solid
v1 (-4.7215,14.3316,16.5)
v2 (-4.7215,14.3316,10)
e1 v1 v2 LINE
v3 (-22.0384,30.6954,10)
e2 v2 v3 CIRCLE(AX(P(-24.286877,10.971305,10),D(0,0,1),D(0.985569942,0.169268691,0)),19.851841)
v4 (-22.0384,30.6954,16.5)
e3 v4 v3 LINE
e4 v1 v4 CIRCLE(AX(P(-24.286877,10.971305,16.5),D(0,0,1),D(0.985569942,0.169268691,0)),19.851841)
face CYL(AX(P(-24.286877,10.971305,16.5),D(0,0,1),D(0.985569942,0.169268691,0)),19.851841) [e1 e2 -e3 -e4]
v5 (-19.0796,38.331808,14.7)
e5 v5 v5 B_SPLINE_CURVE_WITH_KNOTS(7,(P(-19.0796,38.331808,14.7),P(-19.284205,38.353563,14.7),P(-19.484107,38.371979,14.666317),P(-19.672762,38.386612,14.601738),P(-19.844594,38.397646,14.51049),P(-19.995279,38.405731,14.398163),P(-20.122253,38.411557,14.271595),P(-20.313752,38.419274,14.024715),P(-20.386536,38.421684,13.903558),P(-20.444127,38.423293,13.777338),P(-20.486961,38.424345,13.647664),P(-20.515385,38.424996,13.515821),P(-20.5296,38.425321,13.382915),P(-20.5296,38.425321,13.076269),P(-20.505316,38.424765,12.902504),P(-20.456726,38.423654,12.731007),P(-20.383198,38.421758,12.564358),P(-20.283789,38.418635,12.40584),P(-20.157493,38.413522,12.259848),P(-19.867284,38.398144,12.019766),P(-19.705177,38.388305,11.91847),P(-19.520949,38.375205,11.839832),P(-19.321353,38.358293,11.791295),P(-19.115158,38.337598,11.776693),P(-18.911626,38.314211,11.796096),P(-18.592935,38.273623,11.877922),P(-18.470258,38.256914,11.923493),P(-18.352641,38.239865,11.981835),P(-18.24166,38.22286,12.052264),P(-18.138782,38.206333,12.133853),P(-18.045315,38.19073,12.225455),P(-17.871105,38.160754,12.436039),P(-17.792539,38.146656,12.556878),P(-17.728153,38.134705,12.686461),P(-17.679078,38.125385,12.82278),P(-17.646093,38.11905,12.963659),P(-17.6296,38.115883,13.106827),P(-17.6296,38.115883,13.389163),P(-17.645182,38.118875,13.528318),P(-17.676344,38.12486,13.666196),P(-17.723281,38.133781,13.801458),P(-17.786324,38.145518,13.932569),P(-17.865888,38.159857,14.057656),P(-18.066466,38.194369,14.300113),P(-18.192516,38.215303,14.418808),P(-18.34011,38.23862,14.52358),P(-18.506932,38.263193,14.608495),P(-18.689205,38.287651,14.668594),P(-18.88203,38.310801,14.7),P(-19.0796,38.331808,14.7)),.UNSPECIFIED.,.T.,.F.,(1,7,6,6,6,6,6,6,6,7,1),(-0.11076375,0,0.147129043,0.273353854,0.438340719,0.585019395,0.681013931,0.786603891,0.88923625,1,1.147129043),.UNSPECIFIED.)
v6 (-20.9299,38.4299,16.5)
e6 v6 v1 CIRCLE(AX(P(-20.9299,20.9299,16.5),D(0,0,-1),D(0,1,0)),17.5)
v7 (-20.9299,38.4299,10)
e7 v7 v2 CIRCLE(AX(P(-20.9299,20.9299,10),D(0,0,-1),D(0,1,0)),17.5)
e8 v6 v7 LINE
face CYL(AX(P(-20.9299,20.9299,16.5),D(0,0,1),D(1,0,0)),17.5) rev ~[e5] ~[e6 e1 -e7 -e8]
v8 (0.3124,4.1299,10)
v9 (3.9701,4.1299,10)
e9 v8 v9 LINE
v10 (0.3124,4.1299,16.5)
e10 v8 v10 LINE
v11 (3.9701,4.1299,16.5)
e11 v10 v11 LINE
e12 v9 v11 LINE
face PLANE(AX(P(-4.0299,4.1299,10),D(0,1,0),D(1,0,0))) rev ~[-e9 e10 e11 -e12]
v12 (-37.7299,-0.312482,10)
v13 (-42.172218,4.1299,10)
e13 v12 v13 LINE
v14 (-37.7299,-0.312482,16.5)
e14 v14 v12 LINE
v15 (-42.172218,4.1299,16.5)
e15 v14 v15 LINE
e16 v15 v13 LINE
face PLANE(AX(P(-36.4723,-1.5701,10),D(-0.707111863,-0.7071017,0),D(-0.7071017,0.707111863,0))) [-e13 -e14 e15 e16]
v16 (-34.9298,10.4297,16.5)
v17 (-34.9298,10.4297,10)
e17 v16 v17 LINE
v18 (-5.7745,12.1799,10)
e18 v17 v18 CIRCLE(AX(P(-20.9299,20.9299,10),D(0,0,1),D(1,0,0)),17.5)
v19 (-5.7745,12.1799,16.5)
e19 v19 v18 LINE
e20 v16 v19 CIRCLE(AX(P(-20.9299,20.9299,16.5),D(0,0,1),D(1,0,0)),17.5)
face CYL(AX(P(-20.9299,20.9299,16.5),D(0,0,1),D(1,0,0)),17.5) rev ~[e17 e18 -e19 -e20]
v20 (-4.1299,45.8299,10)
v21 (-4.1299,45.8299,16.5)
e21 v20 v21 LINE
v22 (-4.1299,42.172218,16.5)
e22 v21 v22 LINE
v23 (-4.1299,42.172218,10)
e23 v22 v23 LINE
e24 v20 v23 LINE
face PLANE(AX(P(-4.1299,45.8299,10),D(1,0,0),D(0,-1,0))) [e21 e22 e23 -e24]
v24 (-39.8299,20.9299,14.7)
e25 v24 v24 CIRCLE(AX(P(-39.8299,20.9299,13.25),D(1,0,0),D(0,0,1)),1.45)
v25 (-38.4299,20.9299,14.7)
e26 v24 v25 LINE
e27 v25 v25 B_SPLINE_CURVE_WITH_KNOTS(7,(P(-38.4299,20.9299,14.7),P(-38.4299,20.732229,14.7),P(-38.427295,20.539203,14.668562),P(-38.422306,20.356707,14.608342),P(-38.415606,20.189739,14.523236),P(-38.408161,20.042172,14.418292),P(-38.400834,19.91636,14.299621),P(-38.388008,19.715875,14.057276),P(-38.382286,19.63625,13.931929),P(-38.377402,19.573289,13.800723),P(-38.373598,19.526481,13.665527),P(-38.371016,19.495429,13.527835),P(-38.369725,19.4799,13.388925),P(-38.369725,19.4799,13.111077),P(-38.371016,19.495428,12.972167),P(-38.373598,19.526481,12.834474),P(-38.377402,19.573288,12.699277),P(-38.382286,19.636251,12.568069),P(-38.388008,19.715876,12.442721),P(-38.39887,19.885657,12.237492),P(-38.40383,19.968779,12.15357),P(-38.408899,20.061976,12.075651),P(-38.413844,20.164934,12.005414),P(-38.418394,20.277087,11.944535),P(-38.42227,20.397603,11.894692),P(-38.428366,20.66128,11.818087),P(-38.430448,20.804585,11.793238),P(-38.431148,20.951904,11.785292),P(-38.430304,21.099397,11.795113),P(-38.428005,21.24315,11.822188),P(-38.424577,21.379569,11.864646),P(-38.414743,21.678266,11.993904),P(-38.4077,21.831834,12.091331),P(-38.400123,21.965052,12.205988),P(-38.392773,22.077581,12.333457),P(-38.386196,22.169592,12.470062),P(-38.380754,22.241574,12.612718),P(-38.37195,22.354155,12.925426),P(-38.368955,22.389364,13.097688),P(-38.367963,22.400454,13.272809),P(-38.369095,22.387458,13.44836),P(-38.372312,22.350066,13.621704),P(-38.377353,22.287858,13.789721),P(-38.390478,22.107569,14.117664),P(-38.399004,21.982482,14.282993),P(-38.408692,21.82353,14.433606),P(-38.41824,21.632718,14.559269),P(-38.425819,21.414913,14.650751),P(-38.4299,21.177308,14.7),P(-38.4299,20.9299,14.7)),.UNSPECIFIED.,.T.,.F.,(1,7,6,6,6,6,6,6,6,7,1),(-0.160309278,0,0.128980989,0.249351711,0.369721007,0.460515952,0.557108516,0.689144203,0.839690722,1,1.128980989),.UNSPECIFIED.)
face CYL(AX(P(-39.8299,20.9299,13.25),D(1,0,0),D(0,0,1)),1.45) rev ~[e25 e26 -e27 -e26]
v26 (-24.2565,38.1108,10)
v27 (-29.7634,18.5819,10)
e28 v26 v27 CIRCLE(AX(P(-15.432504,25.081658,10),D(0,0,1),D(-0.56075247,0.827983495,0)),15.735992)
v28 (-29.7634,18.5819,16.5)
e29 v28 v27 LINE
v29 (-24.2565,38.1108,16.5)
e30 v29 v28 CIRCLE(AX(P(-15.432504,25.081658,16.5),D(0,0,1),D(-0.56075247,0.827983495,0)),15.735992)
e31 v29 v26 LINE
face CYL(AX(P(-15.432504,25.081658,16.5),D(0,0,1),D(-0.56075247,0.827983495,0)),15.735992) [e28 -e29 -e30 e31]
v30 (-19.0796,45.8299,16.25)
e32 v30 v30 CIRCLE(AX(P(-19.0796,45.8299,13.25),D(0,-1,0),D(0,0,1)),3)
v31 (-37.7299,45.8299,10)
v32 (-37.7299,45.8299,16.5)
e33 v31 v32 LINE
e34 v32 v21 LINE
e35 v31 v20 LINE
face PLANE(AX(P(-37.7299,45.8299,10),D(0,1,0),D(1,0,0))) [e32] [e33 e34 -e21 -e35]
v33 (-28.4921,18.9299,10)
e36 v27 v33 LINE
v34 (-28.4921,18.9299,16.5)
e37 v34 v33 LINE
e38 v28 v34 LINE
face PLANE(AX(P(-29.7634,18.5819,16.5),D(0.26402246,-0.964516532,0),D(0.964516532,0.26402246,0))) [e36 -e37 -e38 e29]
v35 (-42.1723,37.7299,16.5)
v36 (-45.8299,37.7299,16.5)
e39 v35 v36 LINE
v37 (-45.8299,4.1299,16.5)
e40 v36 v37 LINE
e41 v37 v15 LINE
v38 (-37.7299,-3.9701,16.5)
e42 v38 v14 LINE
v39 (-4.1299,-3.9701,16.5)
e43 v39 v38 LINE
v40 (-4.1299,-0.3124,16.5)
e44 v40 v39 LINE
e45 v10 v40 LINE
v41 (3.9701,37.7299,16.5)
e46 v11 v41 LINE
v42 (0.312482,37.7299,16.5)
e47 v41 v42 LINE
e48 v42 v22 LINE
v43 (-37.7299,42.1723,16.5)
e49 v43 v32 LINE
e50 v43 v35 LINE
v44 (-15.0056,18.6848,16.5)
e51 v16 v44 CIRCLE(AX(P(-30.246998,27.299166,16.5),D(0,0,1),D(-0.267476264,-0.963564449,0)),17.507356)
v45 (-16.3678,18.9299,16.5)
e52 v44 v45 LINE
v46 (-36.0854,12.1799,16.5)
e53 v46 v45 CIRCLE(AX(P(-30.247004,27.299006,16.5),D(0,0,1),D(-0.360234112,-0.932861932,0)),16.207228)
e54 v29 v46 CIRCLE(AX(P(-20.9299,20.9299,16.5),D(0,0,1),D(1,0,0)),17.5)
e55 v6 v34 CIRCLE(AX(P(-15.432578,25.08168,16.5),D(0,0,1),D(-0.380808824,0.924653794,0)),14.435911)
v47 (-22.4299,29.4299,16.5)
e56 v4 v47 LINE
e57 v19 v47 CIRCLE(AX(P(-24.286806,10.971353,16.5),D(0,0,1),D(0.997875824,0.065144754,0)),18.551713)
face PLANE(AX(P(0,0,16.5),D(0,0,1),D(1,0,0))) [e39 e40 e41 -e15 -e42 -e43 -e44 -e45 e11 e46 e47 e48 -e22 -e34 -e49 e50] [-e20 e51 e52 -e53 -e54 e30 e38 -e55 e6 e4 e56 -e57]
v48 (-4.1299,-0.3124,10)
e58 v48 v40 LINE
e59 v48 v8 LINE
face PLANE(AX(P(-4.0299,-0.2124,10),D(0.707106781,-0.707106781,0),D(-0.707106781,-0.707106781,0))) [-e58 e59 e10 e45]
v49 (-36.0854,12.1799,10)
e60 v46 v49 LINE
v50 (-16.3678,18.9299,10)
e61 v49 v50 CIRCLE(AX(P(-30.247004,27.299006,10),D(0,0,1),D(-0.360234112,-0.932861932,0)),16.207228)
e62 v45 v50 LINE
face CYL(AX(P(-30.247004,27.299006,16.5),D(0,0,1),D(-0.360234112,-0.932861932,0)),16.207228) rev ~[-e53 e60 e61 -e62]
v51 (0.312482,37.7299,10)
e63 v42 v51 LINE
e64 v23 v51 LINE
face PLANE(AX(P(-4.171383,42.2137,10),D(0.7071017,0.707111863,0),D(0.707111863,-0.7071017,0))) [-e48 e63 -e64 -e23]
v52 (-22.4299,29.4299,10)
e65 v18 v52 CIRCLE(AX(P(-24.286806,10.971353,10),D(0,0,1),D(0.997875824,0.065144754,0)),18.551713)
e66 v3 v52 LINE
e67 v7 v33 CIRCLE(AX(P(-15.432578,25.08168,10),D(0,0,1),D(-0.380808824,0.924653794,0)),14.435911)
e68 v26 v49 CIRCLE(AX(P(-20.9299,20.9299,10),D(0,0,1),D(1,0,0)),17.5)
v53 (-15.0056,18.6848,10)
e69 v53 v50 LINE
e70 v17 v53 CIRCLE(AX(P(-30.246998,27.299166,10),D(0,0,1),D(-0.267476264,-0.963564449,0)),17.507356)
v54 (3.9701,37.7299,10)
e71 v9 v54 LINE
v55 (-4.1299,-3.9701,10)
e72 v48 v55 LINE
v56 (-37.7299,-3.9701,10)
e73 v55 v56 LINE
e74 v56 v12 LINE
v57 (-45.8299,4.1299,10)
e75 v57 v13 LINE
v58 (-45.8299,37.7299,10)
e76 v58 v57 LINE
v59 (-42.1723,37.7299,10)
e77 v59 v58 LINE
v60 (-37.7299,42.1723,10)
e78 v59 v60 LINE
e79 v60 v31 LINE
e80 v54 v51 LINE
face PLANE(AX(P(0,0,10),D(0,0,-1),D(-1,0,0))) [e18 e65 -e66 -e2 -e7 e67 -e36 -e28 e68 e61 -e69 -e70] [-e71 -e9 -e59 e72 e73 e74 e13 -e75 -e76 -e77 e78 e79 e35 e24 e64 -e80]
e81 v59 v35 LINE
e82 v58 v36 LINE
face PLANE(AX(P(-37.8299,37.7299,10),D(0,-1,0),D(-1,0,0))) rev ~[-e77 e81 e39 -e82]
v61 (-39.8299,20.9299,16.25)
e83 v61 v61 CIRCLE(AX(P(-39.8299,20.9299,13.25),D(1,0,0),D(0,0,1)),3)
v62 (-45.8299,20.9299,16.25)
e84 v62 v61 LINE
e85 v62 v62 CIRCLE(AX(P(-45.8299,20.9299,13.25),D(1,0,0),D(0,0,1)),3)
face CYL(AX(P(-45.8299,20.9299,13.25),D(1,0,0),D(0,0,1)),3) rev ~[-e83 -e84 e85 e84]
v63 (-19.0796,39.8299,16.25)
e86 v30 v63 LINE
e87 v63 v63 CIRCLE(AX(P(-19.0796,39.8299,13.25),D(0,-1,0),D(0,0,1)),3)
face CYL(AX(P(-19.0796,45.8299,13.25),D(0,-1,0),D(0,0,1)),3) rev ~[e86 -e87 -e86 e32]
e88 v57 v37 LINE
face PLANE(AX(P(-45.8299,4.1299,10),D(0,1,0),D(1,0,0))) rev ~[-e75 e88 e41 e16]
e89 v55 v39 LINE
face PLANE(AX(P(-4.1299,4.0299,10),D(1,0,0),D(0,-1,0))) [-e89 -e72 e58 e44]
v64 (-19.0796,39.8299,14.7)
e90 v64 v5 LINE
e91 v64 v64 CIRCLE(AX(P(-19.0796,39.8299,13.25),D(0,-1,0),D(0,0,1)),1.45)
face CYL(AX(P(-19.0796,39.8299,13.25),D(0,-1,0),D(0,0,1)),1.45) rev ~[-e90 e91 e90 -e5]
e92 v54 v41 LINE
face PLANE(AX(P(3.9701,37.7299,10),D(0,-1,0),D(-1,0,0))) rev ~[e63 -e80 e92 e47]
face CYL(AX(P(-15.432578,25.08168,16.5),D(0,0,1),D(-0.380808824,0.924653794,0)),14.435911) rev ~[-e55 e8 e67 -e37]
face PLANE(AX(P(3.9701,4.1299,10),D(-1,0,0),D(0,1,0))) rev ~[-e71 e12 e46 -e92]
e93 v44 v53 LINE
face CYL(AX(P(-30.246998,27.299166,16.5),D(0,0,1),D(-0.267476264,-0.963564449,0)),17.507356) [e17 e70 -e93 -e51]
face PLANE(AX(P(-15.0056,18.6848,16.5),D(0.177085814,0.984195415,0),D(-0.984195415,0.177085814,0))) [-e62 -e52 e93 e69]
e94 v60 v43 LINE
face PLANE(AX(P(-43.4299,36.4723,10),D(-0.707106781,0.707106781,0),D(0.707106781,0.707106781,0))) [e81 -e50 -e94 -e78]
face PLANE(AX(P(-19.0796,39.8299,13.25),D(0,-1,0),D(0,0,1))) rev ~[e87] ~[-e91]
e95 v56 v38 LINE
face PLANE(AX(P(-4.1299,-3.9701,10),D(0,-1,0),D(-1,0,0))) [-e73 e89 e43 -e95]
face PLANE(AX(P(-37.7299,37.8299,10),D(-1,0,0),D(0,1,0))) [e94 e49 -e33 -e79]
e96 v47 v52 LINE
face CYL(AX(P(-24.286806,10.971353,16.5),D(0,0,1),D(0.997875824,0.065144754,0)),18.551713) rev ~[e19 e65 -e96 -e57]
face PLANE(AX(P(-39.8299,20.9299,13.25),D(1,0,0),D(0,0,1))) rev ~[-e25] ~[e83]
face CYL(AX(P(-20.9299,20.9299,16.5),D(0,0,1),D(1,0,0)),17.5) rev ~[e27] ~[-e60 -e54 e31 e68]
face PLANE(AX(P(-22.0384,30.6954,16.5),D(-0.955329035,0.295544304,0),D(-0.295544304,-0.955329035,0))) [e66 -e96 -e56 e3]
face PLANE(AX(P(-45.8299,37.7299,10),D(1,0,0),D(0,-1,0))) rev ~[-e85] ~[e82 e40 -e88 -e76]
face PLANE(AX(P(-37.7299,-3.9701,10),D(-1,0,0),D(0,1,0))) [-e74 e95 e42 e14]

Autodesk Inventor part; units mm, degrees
ref_plane "YZ Plane" through (0, 0, 0) normal (1, 0, 0) x (0, 1, 0)
ref_plane "Work Plane1" through (0, 0, 10) normal (0, 0, 1) x (1, 0, 0)
sketch "Sketch1" plane through (0, 0, 10) normal (0, 0, 1) x (1, 0, 0)
  line L0 (-4.0299, -0.3538) -> (-2.2322, 1.4439) construction
  arc A0 (-1.4439, 2.2322) -> (-2.2322, 1.4439) centre (-0.9299, 0.9299) ccw construction
  line L1 (-1.4439, 2.2322) -> (0.3538, 4.0299) construction
  line L2 (-37.8299, 42.2137) -> (-37.8299, 45.8299) construction
  line L3 (-37.8299, 45.8299) -> (-4.0299, 45.8299) construction
  line L4 (-4.0299, 45.8299) -> (-4.0299, 42.2137) construction
  line L5 (-4.0299, 4.0299) -> (0.3538, 4.0299) projected
  line L6 (-20.9299, 58.9723) -> (17.1124, 20.9299) construction
  line L7 (17.1124, 20.9299) -> (-20.9299, -17.1124) construction
  line L8 (-20.9299, -17.1124) -> (-58.9723, 20.9299) construction
  line L9 (-58.9723, 20.9299) -> (-20.9299, 58.9723) construction
  line L10 (-20.9299, 58.9723) -> (-20.9299, -17.1124) construction
  line L11 (17.1124, 20.9299) -> (-58.9723, 20.9299) construction
  line L12 (-20.9299, 58.9723) -> (32.8701, 58.9723) construction
  line L13 (-43.4299, 43.4299) -> (1.5701, 43.4299) construction
  line L14 (1.5701, 43.4299) -> (1.5701, -1.5701) construction
  line L15 (1.5701, -1.5701) -> (-43.4299, -1.5701) construction
  line L16 (-43.4299, -1.5701) -> (-43.4299, 43.4299) construction
  line L17 (-43.4299, 43.4299) -> (1.5701, -1.5701) construction
  line L18 (1.5701, 43.4299) -> (-43.4299, -1.5701) construction
  line L19 (-43.4299, 5.3876) -> (-43.4299, 36.4723)
  line L20 (-43.4299, 36.4723) -> (-36.4723, 43.4299)
  line L21 (-36.4723, 43.4299) -> (-5.3876, 43.4299)
  line L22 (-5.3876, 43.4299) -> (1.5701, 36.4723)
  line L23 (1.5701, 36.4723) -> (1.5701, 5.3876)
  line L24 (1.5701, 5.3876) -> (-5.3876, -1.5701)
  line L25 (-5.3876, -1.5701) -> (-36.4723, -1.5701)
  line L26 (-36.4723, -1.5701) -> (-43.4299, 5.3876)
  line L27 (-4.0299, 42.2137) -> (-37.8299, 42.2137) projected
  line L28 (-4.0299, -0.3538) -> (-4.0299, 4.0299) projected
  circle A1 centre (-20.9299, 20.9299) radius 13.3985
  circle A2 centre (-20.9299, 20.9299) radius 15.4895
  point P0 (-37.8299, 4.0299)
  dimension "d18" = 53.8
  dimension "d19" = 45
  dimension "d20" = 53.8
  dimension "d21" = 45
  dimension "d22" = 45
  dimension "d30" = 26.797
  dimension "d36" = 30.979
extrude "Extrusion1" add sketch "Sketch1" along normal blind 6.5 contours L28 L24 L25 L26 L19 L20 L27 L22 L23 L5 | L5 L24 L28 | L27 L20 L21 L22 | A1 | A2
ref_plane "Work Plane2" through (-40.9959, 0.8639, 22.2359) normal (0, 0, 1) x (1, 0, 0)
sketch "Sketch3" plane through (0, 0, 10) normal (0, 0, -1) x (-1, 0, 0)
  line L0 (37.8299, -0.4701) -> (37.8299, 4.0299) construction
  line L1 (4.0299, 4.0299) -> (4.0299, -0.4701) construction
  line L2 (37.8299, -0.4701) -> (37.8299, 1.1886) construction
  line L3 (4.0299, -3.9701) -> (4.0299, -0.3538) construction
  line L4 (45.8299, 4.0299) -> (42.2137, 4.0299) construction
  line L5 (-0.3538, 4.0299) -> (-3.9701, 4.0299) construction
  line L6 (-3.9701, 37.8299) -> (-0.3538, 37.8299) construction
  line L7 (4.0299, 42.2137) -> (4.0299, 45.8299) construction
  line L8 (37.8299, 45.8299) -> (37.8299, 42.2137) construction
  line L9 (42.2137, 37.8299) -> (45.8299, 37.8299) construction
  line L10 (37.8299, 37.7299) -> (45.8299, 37.7299)
  line L11 (45.8299, 37.7299) -> (45.8299, 4.1299)
  line L12 (45.8299, 4.1299) -> (37.8299, 4.1299)
  line L13 (37.8299, 4.1299) -> (37.8299, 37.7299)
  line L14 (37.7299, 4.0299) -> (4.1299, 4.0299)
  line L15 (4.1299, 4.0299) -> (4.1299, -3.9701)
  line L16 (4.1299, -3.9701) -> (37.7299, -3.9701)
  line L17 (37.7299, -3.9701) -> (37.7299, 4.0299)
  line L18 (4.0299, 4.1299) -> (-3.9701, 4.1299)
  line L19 (-3.9701, 4.1299) -> (-3.9701, 37.7299)
  line L20 (-3.9701, 37.7299) -> (4.0299, 37.7299)
  line L21 (4.0299, 37.7299) -> (4.0299, 4.1299)
  line L22 (4.1299, 37.8299) -> (37.7299, 37.8299)
  line L23 (37.7299, 37.8299) -> (37.7299, 45.8299)
  line L24 (37.7299, 45.8299) -> (4.1299, 45.8299)
  line L25 (4.1299, 45.8299) -> (4.1299, 37.8299)
  point P0 (0, 0)
  dimension "d23" = 0.1
  dimension "d24" = 0.1
  dimension "d25" = 0.1
  dimension "d26" = 0.1
  dimension "d27" = 0.1
extrude "Extrusion3" add sketch "Sketch3" against normal up to surface (6.5 mm away)
sketch "Sketch6" plane through (0, 0, 16.5) normal (0, 0, 1) x (1, 0, 0)
  circle A0 centre (-20.9299, 20.9299) radius 17.5
  circle A1 centre (-20.9299, 20.9299) radius 13.3985
  line L0 (-45.8299, 4.1299) -> (-45.8299, 37.7299) projected
  line L1 (-4.1299, -3.9701) -> (-37.7299, -3.9701) projected
  line L2 (-37.7299, 45.8299) -> (-4.1299, 45.8299) projected
  point P0 (0, 0)
  point P1 (-45.8299, 20.9299)
  point P2 (-20.9299, -3.9701)
  point P3 (-20.9299, 45.8299)
  dimension "d37" = 26.797
  dimension "d38" = 35
extrude "Extrusion5" cut sketch "Sketch6" against normal blind 12 contours A0 | A1
sketch "Sketch7" plane through (0, 0, 16.5) normal (0, 0, 1) x (1, 0, 0)
  circle A0 centre (-20.9299, 20.9299) radius 17.5 construction
  line L0 (3.9701, 4.1299) -> (0.3124, 4.1299) construction
  line L1 (3.9701, 37.7299) -> (3.9701, 4.1299) construction
  line L2 (0.3124, 37.7299) -> (3.9701, 37.7299) construction
  line L3 (0.3124, 37.7299) -> (-4.1299, 42.1723) construction
  line L4 (-4.1299, 45.8299) -> (-4.1299, 42.1723) construction
  line L5 (-37.7299, 45.8299) -> (-4.1299, 45.8299) construction
  line L6 (-37.7299, 42.1723) -> (-37.7299, 45.8299) construction
  line L7 (-37.7299, 42.1723) -> (-42.1723, 37.7299) construction
  line L8 (-45.8299, 37.7299) -> (-42.1723, 37.7299) construction
  line L9 (-45.8299, 4.1299) -> (-45.8299, 37.7299) construction
  line L10 (-42.1723, 4.1299) -> (-45.8299, 4.1299) construction
  line L11 (-42.1723, 4.1299) -> (-37.7299, -0.3124) construction
  line L12 (-37.7299, -3.9701) -> (-37.7299, -0.3124) construction
  line L13 (-4.1299, -3.9701) -> (-37.7299, -3.9701) construction
  line L14 (-4.1299, -0.3124) -> (-4.1299, -3.9701) construction
  line L15 (-4.1299, -0.3124) -> (0.3124, 4.1299) construction
  circle A1 centre (-20.9299, 20.9299) radius 17.5 construction
  line L16 (-5.7745, 12.1799) -> (-36.0854, 12.1799) construction
  line L17 (-36.0854, 12.1799) -> (-20.9299, 38.4299) construction
  line L18 (-20.9299, 38.4299) -> (-5.7745, 12.1799) construction
  circle A2 centre (-22.4299, 22.4299) radius 7 construction
  arc A3 (-20.9299, 38.4299) -> (-24.2565, 38.1108) centre (-20.9299, 20.9299) ccw
  line L19 (-28.4921, 18.9299) -> (-22.4299, 29.4299)
  line L20 (-22.4299, 29.4299) -> (-16.3678, 18.9299)
  line L21 (-16.3678, 18.9299) -> (-28.4921, 18.9299)
  arc A4 (-20.9299, 38.4299) -> (-28.4921, 18.9299) centre (-15.4327, 25.0818) ccw
  arc A5 (-24.2565, 38.1108) -> (-29.7634, 18.5819) centre (-15.4327, 25.0818) ccw
  line L22 (-29.7634, 18.5819) -> (-28.4921, 18.9299)
  arc A6 (-5.7745, 12.1799) -> (-22.4299, 29.4299) centre (-24.2867, 10.9714) ccw
  arc A7 (-5.7745, 12.1799) -> (-4.7215, 14.3316) centre (-20.9299, 20.9299) ccw
  arc A8 (-4.7215, 14.3316) -> (-22.0384, 30.6954) centre (-24.2867, 10.9714) ccw
  line L23 (-22.0384, 30.6954) -> (-22.4299, 29.4299)
  arc A9 (-36.0854, 12.1799) -> (-16.3678, 18.9299) centre (-30.247, 27.2992) ccw
  arc A10 (-36.0854, 12.1799) -> (-34.9298, 10.4297) centre (-20.9299, 20.9299) ccw
  arc A11 (-34.9298, 10.4297) -> (-15.0056, 18.6848) centre (-30.247, 27.2992) ccw
  line L24 (-15.0056, 18.6848) -> (-16.3678, 18.9299)
  dimension "d93" = 14
  dimension "d94" = 1.5
  dimension "d95" = 1.5
  dimension "d96" = 1.3
  dimension "d97" = 1.3
  dimension "d98" = 1.3
extrude "Extrusion6" add sketch "Sketch7" against normal up to surface (6.5 mm away) contours A4 L22 A5 A3 | L23 A8 A7 A6 | L24 A11 A10 A9
sketch "Sketch8" plane through (-37.7299, 45.8299, 10) normal (0, 1, 0) x (1, 0, 0)
  line L0 (0, 0) -> (33.6, 0) projected
  line L1 (0, -6.5) -> (33.6, -6.5) projected
  line L2 (33.6, 0) -> (33.6, -6.5) projected
  line L3 (0, 0) -> (0, -6.5) projected
  point P0 (37.7299, 10)
  point P1 (16.8, -3.25)
  point P2 (16.8, 0)
  point P3 (16.8, -6.5)
  point P4 (33.6, -3.25)
  point P5 (0, -3.25)
  point P6 (18.6503, -3.25)
hole "Hole1" at (-19.0796, 45.8299, 13.25) direction (0, -1, 0) diameter 2.9 depth 11 tip angle 118 counterbore diameter 6 counterbore depth 6
sketch "Sketch9" plane through (-45.8299, 4.1299, 10) normal (1, 0, 0) x (0, 0, -1)
  line L0 (0, 0) -> (0, 33.6) projected
  line L1 (-6.5, 33.6) -> (-6.5, 0) projected
  line L2 (0, 33.6) -> (-6.5, 33.6) projected
  line L3 (0, 0) -> (-6.5, 0) projected
  point P0 (10, -4.1299)
  point P1 (-3.25, 16.8)
  point P2 (0, 16.8)
  point P3 (-6.5, 16.8)
  point P4 (-3.25, 33.6)
  point P5 (-3.25, 0)
hole "Hole2" at (-45.8299, 20.9299, 13.25) direction (1, 0, 0) diameter 2.9 depth 11 tip angle 118 counterbore diameter 6 counterbore depth 6
properties part number "50_Cube_Insert_Thorlabs"
